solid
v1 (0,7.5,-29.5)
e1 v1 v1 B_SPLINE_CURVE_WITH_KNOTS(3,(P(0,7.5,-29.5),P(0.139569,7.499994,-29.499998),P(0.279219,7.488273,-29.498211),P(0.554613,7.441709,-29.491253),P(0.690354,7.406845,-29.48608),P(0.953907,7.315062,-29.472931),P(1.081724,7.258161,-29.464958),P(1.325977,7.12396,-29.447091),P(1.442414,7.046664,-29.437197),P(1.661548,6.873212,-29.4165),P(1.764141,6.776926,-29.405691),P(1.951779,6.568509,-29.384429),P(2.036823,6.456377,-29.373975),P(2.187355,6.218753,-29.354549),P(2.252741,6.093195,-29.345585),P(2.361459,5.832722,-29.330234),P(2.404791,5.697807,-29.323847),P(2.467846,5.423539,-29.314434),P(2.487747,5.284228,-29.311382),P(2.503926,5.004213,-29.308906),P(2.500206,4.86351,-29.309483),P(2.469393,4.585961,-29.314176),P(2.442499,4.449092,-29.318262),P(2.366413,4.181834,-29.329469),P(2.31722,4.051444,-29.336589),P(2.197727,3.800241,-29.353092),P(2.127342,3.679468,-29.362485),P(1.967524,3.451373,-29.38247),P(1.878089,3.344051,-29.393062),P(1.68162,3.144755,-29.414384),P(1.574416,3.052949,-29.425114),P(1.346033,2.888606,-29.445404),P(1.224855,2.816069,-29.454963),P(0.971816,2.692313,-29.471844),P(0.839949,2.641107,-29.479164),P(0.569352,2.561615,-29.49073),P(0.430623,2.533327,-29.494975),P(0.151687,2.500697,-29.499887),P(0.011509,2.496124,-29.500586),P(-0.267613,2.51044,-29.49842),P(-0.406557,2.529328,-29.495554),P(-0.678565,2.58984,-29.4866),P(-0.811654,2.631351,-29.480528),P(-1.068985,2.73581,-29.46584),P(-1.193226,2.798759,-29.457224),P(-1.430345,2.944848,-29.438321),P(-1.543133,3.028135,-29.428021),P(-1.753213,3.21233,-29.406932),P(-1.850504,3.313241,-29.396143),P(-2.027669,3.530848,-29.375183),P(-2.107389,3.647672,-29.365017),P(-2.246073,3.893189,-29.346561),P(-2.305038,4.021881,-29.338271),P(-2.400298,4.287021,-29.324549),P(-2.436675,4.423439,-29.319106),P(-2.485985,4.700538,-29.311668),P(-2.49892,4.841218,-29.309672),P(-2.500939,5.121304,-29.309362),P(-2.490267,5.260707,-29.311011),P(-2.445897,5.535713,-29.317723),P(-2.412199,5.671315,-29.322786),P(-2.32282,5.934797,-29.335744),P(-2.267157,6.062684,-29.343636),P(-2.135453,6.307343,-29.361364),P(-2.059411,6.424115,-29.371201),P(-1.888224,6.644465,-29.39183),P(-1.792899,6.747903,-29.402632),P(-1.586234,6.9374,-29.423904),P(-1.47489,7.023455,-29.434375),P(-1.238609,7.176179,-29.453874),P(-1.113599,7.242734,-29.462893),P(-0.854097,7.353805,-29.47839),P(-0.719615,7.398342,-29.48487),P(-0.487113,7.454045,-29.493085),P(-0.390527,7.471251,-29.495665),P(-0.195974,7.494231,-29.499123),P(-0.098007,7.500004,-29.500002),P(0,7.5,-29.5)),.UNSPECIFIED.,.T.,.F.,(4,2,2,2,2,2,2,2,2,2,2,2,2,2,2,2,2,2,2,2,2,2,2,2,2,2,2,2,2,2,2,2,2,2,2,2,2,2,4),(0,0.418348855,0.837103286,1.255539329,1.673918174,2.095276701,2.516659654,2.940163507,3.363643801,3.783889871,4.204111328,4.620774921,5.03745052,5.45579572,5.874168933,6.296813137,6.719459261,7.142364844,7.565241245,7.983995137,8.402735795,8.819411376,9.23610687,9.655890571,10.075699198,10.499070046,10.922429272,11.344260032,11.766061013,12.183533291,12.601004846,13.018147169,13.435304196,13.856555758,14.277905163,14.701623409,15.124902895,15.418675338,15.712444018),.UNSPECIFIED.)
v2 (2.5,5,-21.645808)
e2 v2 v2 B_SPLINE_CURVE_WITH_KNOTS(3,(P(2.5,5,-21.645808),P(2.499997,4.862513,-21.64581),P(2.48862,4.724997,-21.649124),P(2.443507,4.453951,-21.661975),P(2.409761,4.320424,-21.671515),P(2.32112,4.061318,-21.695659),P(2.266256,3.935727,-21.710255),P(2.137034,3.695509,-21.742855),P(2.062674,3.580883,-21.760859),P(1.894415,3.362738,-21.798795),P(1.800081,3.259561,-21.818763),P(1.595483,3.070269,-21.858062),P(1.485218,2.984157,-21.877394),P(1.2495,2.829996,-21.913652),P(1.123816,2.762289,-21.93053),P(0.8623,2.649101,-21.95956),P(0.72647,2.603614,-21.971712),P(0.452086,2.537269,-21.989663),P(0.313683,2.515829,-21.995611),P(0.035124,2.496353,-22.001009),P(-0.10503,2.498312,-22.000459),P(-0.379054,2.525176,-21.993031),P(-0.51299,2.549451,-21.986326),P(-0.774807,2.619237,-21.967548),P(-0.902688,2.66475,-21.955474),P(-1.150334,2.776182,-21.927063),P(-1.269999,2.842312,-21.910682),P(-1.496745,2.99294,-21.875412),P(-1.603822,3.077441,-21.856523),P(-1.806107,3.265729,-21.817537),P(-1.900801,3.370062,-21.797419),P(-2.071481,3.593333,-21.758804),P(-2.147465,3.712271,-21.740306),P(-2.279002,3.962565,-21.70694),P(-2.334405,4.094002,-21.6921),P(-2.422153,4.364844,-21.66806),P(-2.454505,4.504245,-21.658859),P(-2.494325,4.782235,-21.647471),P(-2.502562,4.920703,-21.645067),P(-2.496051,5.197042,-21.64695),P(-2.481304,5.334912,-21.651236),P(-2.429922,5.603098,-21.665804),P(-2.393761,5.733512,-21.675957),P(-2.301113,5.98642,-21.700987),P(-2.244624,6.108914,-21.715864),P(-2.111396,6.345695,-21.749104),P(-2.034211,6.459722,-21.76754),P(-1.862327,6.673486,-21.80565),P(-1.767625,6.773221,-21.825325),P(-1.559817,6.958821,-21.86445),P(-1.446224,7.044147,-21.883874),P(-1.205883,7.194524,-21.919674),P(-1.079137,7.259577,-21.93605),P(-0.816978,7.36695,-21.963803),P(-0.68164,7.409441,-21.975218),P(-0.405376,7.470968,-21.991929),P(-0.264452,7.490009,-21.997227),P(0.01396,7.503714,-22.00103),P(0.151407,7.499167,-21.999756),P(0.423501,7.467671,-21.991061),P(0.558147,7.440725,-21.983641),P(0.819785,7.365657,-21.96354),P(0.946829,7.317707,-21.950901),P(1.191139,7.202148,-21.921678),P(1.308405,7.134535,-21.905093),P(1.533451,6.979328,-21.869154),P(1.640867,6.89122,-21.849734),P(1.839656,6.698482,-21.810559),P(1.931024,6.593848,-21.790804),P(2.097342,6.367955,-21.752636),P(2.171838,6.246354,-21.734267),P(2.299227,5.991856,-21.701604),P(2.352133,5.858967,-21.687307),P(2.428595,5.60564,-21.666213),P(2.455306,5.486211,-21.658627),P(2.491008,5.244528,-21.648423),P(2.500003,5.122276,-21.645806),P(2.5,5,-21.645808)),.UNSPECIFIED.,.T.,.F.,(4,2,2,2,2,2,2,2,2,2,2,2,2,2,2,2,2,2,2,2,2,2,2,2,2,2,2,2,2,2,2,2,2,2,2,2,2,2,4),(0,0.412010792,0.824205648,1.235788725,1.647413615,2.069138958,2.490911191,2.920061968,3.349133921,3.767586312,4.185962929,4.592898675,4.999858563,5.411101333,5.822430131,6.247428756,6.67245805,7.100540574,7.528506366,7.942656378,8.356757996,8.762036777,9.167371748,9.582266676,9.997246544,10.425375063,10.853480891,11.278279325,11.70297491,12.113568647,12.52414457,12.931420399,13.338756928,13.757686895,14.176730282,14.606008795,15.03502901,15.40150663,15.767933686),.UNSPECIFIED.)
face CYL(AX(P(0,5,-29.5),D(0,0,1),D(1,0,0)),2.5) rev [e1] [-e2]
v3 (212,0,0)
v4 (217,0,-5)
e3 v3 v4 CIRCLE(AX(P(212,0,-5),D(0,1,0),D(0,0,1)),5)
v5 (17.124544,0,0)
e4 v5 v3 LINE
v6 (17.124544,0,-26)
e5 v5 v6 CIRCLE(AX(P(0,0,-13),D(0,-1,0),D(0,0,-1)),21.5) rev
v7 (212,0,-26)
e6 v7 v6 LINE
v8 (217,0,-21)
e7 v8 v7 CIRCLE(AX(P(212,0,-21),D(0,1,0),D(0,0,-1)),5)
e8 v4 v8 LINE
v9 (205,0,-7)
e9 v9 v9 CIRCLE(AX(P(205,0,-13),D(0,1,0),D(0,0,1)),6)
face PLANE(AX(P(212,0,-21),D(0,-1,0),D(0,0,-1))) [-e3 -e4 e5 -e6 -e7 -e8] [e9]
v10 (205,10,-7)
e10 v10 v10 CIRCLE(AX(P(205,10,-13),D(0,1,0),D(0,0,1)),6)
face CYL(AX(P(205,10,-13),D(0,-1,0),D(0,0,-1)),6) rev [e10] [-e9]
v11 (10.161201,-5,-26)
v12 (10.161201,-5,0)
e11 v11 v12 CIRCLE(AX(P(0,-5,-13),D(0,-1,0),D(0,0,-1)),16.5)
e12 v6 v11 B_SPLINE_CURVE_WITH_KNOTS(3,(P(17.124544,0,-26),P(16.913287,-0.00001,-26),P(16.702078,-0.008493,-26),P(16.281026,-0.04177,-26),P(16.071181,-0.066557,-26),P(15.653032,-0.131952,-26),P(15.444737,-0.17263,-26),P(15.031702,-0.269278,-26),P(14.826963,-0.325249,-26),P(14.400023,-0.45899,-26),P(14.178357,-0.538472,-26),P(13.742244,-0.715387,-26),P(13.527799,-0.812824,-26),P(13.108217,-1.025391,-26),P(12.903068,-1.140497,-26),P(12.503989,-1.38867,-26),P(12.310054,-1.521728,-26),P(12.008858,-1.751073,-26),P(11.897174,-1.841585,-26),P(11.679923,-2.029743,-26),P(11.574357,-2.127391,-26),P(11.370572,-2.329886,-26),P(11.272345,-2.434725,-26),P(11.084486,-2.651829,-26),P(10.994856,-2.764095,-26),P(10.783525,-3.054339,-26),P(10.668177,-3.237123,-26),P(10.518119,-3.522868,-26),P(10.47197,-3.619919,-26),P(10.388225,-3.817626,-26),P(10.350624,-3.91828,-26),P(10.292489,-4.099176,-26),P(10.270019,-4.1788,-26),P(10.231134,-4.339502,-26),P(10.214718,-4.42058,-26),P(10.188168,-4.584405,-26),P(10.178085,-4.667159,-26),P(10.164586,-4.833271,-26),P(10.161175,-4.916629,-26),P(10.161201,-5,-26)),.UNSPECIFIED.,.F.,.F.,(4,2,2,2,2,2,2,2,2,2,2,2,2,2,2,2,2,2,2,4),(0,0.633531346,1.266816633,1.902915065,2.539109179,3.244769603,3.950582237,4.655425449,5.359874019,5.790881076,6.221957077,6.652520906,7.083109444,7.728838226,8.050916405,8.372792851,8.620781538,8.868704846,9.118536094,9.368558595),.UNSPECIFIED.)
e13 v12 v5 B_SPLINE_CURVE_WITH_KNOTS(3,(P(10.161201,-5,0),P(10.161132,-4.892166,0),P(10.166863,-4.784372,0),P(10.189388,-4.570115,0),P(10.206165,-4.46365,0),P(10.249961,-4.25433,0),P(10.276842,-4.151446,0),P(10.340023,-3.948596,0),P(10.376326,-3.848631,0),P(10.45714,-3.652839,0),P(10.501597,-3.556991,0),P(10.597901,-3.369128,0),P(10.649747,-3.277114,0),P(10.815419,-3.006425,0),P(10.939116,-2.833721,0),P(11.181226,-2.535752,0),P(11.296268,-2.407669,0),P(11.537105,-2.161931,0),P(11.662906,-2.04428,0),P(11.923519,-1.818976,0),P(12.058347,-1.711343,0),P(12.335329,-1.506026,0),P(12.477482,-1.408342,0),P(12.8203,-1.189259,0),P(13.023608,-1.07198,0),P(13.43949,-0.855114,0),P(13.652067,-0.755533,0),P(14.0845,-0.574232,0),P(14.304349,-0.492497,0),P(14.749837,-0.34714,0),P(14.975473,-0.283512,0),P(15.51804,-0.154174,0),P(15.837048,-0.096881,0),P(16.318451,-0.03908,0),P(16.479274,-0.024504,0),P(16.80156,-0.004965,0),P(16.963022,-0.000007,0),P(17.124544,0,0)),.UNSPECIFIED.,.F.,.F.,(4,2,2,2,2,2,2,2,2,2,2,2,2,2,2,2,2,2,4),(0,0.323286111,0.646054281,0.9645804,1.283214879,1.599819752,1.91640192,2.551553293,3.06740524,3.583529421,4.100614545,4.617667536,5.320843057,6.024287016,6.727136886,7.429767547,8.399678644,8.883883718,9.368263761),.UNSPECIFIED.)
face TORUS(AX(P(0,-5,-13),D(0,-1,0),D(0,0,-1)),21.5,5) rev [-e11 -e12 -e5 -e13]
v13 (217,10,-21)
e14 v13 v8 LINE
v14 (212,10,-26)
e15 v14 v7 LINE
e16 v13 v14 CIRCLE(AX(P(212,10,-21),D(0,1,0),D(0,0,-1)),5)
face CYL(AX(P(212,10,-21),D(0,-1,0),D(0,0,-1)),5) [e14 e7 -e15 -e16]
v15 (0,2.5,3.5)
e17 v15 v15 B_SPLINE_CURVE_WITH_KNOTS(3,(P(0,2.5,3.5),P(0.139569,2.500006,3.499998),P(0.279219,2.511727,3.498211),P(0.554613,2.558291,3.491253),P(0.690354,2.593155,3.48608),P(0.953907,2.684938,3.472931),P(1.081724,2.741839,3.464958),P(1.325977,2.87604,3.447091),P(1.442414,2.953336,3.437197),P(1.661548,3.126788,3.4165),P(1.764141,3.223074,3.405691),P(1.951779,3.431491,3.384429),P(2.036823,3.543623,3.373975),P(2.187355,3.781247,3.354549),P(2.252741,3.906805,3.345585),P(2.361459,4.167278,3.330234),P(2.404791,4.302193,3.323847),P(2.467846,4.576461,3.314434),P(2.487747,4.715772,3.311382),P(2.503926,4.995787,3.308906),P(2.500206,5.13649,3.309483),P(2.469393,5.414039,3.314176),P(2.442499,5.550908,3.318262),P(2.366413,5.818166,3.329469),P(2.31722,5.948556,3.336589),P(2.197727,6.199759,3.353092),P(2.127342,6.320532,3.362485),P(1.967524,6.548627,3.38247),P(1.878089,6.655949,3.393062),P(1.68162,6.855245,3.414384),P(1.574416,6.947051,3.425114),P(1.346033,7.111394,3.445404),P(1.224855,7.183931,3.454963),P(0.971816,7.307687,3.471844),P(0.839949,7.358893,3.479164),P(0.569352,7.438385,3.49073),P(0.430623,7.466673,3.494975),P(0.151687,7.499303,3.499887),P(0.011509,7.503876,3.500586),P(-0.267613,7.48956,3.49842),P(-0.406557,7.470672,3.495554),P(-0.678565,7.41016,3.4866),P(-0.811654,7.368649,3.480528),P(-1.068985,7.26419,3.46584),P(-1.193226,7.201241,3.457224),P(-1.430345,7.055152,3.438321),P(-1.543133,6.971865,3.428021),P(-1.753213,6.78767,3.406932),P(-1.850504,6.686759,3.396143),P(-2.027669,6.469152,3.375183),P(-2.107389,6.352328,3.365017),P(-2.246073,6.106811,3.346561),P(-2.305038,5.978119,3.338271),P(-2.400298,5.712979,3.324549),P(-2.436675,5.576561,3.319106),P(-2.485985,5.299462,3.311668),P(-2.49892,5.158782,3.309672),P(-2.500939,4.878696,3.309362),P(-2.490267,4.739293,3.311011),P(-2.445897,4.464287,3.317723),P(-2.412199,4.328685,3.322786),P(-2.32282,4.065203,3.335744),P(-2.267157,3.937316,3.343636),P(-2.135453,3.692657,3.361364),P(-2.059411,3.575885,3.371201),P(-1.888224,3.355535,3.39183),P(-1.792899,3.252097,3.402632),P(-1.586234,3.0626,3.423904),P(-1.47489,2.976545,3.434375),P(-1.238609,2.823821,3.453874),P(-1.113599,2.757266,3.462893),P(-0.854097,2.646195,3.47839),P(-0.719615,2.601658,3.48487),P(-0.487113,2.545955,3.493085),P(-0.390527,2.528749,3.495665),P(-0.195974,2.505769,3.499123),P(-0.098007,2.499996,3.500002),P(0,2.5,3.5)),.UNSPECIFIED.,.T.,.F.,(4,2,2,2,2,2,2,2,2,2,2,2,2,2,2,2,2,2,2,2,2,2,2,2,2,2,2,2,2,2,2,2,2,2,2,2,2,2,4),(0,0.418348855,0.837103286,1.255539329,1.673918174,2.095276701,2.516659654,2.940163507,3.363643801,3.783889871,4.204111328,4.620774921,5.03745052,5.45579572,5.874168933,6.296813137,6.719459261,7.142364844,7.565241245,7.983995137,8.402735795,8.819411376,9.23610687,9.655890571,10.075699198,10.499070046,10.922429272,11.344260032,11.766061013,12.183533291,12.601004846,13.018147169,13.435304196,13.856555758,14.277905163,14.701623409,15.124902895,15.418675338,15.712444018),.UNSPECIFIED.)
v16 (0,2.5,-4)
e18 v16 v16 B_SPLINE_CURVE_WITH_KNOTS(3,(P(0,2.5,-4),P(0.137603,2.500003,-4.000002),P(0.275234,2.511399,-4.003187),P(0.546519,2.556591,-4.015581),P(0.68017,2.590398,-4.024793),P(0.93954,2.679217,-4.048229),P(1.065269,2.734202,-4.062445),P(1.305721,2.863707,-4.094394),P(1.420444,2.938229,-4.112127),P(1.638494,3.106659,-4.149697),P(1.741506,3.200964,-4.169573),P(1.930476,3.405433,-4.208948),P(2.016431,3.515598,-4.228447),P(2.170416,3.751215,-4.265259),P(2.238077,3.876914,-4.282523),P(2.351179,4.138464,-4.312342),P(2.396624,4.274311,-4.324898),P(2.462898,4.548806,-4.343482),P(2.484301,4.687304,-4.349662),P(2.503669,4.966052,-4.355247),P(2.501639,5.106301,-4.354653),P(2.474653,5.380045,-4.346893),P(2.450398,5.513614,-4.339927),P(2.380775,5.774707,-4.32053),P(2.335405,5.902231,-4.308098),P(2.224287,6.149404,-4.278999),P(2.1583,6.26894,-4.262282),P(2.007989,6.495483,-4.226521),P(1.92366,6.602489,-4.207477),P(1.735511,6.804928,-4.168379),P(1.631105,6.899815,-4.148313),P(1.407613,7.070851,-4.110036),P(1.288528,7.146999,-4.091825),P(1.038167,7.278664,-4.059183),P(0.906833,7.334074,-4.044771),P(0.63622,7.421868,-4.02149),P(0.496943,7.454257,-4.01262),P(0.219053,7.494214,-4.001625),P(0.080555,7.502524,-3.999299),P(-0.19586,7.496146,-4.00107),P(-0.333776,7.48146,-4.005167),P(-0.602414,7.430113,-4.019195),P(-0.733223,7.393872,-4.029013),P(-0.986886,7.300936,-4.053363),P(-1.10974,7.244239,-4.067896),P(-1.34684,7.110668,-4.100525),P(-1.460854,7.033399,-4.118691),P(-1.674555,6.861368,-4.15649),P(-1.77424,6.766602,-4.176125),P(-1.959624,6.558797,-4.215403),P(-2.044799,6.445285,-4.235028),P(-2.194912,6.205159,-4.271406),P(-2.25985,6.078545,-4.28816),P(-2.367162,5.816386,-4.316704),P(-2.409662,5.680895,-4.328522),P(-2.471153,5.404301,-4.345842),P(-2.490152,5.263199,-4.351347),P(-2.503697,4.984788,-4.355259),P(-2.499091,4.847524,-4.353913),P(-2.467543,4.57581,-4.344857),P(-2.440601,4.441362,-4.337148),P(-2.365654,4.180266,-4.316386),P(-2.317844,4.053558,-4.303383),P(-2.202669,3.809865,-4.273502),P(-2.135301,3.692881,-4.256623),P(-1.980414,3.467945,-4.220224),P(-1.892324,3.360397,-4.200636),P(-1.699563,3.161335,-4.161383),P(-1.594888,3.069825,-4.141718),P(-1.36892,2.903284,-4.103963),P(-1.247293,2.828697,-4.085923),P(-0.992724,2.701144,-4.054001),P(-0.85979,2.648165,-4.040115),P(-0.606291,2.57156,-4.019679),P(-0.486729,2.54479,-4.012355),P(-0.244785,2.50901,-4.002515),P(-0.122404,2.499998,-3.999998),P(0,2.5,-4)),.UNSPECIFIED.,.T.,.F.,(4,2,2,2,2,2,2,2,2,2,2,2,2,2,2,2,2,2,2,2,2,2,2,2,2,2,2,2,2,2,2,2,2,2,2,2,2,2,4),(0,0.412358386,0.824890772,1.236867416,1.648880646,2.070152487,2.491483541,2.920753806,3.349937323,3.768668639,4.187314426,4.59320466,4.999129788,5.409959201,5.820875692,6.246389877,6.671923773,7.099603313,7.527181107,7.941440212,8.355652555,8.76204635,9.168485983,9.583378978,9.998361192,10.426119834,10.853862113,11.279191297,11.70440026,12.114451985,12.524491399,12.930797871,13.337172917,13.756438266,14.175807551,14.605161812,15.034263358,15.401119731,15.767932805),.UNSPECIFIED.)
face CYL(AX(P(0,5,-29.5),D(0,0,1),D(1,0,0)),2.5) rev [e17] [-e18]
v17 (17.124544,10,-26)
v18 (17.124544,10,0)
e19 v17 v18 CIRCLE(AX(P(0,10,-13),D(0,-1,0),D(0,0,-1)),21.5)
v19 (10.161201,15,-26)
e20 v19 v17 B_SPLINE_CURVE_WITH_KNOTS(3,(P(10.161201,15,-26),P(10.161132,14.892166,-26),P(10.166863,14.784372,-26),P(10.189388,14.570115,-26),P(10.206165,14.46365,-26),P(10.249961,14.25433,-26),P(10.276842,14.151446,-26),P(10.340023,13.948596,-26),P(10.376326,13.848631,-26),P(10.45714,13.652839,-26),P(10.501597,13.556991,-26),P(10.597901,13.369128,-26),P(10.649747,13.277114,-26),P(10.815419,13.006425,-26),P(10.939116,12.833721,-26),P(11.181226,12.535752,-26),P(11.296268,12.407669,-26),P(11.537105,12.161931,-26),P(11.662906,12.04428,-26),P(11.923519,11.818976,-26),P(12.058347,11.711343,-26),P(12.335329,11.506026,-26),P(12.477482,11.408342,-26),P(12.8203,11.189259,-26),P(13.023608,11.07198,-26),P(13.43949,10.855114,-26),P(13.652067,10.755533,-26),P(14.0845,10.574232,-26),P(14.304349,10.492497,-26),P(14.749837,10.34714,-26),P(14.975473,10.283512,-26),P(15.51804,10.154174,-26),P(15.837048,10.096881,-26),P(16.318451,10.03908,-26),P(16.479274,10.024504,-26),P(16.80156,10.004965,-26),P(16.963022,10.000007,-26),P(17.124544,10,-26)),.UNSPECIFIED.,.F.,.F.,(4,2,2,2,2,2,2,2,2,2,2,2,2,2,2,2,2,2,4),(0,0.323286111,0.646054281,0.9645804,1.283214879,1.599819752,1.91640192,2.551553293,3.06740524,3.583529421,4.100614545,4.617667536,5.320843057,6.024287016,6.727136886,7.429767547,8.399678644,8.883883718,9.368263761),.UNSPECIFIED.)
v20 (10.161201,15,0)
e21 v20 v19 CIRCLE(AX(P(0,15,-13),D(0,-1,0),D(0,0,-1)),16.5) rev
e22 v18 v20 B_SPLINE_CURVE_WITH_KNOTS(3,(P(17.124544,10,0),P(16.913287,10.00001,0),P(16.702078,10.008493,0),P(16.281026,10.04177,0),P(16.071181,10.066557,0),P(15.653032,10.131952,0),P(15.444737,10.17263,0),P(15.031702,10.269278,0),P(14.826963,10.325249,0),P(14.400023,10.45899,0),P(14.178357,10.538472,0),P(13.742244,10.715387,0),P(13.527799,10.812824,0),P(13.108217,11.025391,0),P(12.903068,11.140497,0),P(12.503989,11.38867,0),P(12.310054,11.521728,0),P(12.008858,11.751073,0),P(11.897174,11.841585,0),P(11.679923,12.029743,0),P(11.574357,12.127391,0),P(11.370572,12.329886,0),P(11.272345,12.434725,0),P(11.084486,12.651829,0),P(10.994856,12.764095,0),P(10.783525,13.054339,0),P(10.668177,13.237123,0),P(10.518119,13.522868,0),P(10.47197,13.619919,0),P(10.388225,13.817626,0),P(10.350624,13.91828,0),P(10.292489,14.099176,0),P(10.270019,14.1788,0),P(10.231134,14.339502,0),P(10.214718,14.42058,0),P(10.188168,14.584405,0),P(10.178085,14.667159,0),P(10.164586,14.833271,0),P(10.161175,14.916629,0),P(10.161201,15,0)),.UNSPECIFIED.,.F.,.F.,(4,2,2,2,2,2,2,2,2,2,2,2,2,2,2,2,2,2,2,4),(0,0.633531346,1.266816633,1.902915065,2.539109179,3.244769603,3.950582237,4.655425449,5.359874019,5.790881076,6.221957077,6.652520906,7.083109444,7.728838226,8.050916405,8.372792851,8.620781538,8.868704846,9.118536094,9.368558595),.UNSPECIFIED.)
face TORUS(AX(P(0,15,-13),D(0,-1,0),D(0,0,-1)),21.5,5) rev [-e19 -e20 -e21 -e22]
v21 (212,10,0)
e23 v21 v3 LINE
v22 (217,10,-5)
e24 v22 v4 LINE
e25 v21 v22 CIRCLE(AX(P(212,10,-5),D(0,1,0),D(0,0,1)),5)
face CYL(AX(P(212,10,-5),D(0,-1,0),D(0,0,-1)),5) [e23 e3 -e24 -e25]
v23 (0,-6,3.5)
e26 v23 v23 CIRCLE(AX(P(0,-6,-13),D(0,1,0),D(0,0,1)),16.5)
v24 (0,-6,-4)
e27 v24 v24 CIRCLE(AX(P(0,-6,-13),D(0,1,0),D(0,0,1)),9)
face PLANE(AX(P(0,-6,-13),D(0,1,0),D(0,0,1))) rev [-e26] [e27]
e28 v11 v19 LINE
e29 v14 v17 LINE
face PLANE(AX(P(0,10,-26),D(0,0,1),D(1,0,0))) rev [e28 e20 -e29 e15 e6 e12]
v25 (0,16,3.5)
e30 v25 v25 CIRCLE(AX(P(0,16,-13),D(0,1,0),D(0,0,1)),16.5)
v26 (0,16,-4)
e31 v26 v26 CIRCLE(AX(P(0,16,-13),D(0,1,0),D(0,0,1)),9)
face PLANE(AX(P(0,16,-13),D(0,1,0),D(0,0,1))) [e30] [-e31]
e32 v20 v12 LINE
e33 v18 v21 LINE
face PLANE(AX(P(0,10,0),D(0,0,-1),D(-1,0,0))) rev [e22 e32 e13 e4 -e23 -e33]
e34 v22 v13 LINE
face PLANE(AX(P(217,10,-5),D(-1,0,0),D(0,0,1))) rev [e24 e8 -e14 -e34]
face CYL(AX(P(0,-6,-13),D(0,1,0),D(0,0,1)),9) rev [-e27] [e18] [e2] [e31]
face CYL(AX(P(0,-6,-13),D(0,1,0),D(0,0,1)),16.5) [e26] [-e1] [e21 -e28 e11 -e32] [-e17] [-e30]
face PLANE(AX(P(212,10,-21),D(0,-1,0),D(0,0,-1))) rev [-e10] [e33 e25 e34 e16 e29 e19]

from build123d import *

# Parameters (mm, degrees)
SZKIC1_R                         = 6
DODANIE_WYCI_GNI_CIE1_DEPTH      = 10
DODANIE_WYCI_GNI_CIE2_DEPTH      = 6
DODANIE_WYCI_GNI_CIE2_DEPTH_BACK = 16
SZKIC2_R                         = 16.5
SZKIC3_R                         = 9
WYTNIJ_WYCI_GNI_CIE1_DEPTH       = 221.098273505
WYTNIJ_WYCI_GNI_CIE2_DEPTH       = 220.579712178
WYTNIJ_WYCI_GNI_CIE2_DEPTH_BACK  = 220.579712178
SZKIC4_R                         = 2.5
ZAOKR_GLENIE1_R                  = 5


with BuildPart() as part:
    # Szkic1 → Dodanie-wyciągnięcie1 (new body)
    with BuildSketch(Plane(origin=(0, 0, 0), x_dir=(1, 0, 0), z_dir=(0, 1, 0))):
        with BuildLine():
            Line((0, 0), (212, 0))
            ThreePointArc((212, 0), (215.535533906, 1.464466094), (217, 5))
            Line((217, 5), (217, 21))
            ThreePointArc((217, 21), (215.535533906, 24.535533906), (212, 26))
            Line((212, 26), (0, 26))
            Line((0, 26), (0, 0))
        make_face()
        with Locations(Location((205, 13, 0), (0, 0, 270))):
            Circle(SZKIC1_R, mode=Mode.SUBTRACT)
    extrude(amount=DODANIE_WYCI_GNI_CIE1_DEPTH)

    # Szkic2 → Dodanie-wyciągnięcie2 (add, two sides: drawn at the far end of the back side and taken through both)
    with BuildSketch(Plane(origin=(0, 10, 0), x_dir=(1, 0, 0), z_dir=(0, 1, 0)).offset(-DODANIE_WYCI_GNI_CIE2_DEPTH_BACK)):
        with Locations(Location((0, 13, 0), (0, 0, 270))):
            Circle(SZKIC2_R)
    extrude(amount=DODANIE_WYCI_GNI_CIE2_DEPTH + DODANIE_WYCI_GNI_CIE2_DEPTH_BACK)

    # Szkic3 → Wytnij-wyciągnięcie1 (cut, through all)
    with BuildSketch(Plane(origin=(0, 16, 0), x_dir=(1, 0, 0), z_dir=(0, 1, 0))):
        with Locations(Location((0, 13, 0), (0, 0, 270))):
            Circle(SZKIC3_R)
    extrude(amount=-WYTNIJ_WYCI_GNI_CIE1_DEPTH, mode=Mode.SUBTRACT)

    # Szkic4 → Wytnij-wyciągnięcie2 (cut, two sides: drawn at the far end of the back side and taken through both)
    with BuildSketch(Plane.XY.offset(-WYTNIJ_WYCI_GNI_CIE2_DEPTH_BACK)):
        with Locations((0, 5)):
            Circle(SZKIC4_R)
    extrude(amount=WYTNIJ_WYCI_GNI_CIE2_DEPTH + WYTNIJ_WYCI_GNI_CIE2_DEPTH_BACK, mode=Mode.SUBTRACT)

    # Zaokrąglenie1
    # the kernel refuses this fillet: 5 mm, written as the material it adds along each edge
    with BuildSketch(Plane(origin=(0, 0, -13), x_dir=(-0.09440175808825453, 0, 0.9955341822709287), z_dir=(-0.9955341822709287, 0, -0.09440175808825453))) as zaokr_glenie1_piece_1_section:
        with BuildLine():
            CenterArc((16.5 + ZAOKR_GLENIE1_R, -ZAOKR_GLENIE1_R), ZAOKR_GLENIE1_R, 90, 90)
            Line((16.5, -ZAOKR_GLENIE1_R), (16.5, 0))
            Line((16.5, 0), (16.5 + ZAOKR_GLENIE1_R, 0))
        make_face()
    zaokr_glenie1_piece_1 = revolve(axis=Axis((0, 0, -13), (0, 1, 0)), revolution_arc=190.833776665, mode=Mode.PRIVATE)
    zaokr_glenie1_piece_1 = split(zaokr_glenie1_piece_1, bisect_by=Plane(origin=(17.924039728, -1.424039728, -26), z_dir=(0, 0, 1)), keep=Keep.TOP, mode=Mode.PRIVATE)
    zaokr_glenie1_piece_1 = split(zaokr_glenie1_piece_1, bisect_by=Plane(origin=(17.924039728, -1.424039728, 0), z_dir=(0, 0, -1)), keep=Keep.TOP, mode=Mode.PRIVATE)
    with BuildSketch(Plane(origin=(0, 10, -13), x_dir=(-0.09440175808827972, 0, 0.9955341822709262), z_dir=(-0.9955341822709262, 0, -0.09440175808827972))) as zaokr_glenie1_piece_2_section:
        with BuildLine():
            CenterArc((16.5 + ZAOKR_GLENIE1_R, ZAOKR_GLENIE1_R), ZAOKR_GLENIE1_R, 180, 90)
            Line((16.5, ZAOKR_GLENIE1_R), (16.5, 0))
            Line((16.5, 0), (16.5 + ZAOKR_GLENIE1_R, 0))
        make_face()
    zaokr_glenie1_piece_2 = revolve(axis=Axis((0, 10, -13), (0, 1, 0)), revolution_arc=190.833776665, mode=Mode.PRIVATE)
    zaokr_glenie1_piece_2 = split(zaokr_glenie1_piece_2, bisect_by=Plane(origin=(17.924039728, 11.424039728, -26), z_dir=(0, 0, 1)), keep=Keep.TOP, mode=Mode.PRIVATE)
    zaokr_glenie1_piece_2 = split(zaokr_glenie1_piece_2, bisect_by=Plane(origin=(17.924039728, 11.424039728, 0), z_dir=(0, 0, -1)), keep=Keep.TOP, mode=Mode.PRIVATE)
    add([zaokr_glenie1_piece_1, zaokr_glenie1_piece_2])


solid = part.part
